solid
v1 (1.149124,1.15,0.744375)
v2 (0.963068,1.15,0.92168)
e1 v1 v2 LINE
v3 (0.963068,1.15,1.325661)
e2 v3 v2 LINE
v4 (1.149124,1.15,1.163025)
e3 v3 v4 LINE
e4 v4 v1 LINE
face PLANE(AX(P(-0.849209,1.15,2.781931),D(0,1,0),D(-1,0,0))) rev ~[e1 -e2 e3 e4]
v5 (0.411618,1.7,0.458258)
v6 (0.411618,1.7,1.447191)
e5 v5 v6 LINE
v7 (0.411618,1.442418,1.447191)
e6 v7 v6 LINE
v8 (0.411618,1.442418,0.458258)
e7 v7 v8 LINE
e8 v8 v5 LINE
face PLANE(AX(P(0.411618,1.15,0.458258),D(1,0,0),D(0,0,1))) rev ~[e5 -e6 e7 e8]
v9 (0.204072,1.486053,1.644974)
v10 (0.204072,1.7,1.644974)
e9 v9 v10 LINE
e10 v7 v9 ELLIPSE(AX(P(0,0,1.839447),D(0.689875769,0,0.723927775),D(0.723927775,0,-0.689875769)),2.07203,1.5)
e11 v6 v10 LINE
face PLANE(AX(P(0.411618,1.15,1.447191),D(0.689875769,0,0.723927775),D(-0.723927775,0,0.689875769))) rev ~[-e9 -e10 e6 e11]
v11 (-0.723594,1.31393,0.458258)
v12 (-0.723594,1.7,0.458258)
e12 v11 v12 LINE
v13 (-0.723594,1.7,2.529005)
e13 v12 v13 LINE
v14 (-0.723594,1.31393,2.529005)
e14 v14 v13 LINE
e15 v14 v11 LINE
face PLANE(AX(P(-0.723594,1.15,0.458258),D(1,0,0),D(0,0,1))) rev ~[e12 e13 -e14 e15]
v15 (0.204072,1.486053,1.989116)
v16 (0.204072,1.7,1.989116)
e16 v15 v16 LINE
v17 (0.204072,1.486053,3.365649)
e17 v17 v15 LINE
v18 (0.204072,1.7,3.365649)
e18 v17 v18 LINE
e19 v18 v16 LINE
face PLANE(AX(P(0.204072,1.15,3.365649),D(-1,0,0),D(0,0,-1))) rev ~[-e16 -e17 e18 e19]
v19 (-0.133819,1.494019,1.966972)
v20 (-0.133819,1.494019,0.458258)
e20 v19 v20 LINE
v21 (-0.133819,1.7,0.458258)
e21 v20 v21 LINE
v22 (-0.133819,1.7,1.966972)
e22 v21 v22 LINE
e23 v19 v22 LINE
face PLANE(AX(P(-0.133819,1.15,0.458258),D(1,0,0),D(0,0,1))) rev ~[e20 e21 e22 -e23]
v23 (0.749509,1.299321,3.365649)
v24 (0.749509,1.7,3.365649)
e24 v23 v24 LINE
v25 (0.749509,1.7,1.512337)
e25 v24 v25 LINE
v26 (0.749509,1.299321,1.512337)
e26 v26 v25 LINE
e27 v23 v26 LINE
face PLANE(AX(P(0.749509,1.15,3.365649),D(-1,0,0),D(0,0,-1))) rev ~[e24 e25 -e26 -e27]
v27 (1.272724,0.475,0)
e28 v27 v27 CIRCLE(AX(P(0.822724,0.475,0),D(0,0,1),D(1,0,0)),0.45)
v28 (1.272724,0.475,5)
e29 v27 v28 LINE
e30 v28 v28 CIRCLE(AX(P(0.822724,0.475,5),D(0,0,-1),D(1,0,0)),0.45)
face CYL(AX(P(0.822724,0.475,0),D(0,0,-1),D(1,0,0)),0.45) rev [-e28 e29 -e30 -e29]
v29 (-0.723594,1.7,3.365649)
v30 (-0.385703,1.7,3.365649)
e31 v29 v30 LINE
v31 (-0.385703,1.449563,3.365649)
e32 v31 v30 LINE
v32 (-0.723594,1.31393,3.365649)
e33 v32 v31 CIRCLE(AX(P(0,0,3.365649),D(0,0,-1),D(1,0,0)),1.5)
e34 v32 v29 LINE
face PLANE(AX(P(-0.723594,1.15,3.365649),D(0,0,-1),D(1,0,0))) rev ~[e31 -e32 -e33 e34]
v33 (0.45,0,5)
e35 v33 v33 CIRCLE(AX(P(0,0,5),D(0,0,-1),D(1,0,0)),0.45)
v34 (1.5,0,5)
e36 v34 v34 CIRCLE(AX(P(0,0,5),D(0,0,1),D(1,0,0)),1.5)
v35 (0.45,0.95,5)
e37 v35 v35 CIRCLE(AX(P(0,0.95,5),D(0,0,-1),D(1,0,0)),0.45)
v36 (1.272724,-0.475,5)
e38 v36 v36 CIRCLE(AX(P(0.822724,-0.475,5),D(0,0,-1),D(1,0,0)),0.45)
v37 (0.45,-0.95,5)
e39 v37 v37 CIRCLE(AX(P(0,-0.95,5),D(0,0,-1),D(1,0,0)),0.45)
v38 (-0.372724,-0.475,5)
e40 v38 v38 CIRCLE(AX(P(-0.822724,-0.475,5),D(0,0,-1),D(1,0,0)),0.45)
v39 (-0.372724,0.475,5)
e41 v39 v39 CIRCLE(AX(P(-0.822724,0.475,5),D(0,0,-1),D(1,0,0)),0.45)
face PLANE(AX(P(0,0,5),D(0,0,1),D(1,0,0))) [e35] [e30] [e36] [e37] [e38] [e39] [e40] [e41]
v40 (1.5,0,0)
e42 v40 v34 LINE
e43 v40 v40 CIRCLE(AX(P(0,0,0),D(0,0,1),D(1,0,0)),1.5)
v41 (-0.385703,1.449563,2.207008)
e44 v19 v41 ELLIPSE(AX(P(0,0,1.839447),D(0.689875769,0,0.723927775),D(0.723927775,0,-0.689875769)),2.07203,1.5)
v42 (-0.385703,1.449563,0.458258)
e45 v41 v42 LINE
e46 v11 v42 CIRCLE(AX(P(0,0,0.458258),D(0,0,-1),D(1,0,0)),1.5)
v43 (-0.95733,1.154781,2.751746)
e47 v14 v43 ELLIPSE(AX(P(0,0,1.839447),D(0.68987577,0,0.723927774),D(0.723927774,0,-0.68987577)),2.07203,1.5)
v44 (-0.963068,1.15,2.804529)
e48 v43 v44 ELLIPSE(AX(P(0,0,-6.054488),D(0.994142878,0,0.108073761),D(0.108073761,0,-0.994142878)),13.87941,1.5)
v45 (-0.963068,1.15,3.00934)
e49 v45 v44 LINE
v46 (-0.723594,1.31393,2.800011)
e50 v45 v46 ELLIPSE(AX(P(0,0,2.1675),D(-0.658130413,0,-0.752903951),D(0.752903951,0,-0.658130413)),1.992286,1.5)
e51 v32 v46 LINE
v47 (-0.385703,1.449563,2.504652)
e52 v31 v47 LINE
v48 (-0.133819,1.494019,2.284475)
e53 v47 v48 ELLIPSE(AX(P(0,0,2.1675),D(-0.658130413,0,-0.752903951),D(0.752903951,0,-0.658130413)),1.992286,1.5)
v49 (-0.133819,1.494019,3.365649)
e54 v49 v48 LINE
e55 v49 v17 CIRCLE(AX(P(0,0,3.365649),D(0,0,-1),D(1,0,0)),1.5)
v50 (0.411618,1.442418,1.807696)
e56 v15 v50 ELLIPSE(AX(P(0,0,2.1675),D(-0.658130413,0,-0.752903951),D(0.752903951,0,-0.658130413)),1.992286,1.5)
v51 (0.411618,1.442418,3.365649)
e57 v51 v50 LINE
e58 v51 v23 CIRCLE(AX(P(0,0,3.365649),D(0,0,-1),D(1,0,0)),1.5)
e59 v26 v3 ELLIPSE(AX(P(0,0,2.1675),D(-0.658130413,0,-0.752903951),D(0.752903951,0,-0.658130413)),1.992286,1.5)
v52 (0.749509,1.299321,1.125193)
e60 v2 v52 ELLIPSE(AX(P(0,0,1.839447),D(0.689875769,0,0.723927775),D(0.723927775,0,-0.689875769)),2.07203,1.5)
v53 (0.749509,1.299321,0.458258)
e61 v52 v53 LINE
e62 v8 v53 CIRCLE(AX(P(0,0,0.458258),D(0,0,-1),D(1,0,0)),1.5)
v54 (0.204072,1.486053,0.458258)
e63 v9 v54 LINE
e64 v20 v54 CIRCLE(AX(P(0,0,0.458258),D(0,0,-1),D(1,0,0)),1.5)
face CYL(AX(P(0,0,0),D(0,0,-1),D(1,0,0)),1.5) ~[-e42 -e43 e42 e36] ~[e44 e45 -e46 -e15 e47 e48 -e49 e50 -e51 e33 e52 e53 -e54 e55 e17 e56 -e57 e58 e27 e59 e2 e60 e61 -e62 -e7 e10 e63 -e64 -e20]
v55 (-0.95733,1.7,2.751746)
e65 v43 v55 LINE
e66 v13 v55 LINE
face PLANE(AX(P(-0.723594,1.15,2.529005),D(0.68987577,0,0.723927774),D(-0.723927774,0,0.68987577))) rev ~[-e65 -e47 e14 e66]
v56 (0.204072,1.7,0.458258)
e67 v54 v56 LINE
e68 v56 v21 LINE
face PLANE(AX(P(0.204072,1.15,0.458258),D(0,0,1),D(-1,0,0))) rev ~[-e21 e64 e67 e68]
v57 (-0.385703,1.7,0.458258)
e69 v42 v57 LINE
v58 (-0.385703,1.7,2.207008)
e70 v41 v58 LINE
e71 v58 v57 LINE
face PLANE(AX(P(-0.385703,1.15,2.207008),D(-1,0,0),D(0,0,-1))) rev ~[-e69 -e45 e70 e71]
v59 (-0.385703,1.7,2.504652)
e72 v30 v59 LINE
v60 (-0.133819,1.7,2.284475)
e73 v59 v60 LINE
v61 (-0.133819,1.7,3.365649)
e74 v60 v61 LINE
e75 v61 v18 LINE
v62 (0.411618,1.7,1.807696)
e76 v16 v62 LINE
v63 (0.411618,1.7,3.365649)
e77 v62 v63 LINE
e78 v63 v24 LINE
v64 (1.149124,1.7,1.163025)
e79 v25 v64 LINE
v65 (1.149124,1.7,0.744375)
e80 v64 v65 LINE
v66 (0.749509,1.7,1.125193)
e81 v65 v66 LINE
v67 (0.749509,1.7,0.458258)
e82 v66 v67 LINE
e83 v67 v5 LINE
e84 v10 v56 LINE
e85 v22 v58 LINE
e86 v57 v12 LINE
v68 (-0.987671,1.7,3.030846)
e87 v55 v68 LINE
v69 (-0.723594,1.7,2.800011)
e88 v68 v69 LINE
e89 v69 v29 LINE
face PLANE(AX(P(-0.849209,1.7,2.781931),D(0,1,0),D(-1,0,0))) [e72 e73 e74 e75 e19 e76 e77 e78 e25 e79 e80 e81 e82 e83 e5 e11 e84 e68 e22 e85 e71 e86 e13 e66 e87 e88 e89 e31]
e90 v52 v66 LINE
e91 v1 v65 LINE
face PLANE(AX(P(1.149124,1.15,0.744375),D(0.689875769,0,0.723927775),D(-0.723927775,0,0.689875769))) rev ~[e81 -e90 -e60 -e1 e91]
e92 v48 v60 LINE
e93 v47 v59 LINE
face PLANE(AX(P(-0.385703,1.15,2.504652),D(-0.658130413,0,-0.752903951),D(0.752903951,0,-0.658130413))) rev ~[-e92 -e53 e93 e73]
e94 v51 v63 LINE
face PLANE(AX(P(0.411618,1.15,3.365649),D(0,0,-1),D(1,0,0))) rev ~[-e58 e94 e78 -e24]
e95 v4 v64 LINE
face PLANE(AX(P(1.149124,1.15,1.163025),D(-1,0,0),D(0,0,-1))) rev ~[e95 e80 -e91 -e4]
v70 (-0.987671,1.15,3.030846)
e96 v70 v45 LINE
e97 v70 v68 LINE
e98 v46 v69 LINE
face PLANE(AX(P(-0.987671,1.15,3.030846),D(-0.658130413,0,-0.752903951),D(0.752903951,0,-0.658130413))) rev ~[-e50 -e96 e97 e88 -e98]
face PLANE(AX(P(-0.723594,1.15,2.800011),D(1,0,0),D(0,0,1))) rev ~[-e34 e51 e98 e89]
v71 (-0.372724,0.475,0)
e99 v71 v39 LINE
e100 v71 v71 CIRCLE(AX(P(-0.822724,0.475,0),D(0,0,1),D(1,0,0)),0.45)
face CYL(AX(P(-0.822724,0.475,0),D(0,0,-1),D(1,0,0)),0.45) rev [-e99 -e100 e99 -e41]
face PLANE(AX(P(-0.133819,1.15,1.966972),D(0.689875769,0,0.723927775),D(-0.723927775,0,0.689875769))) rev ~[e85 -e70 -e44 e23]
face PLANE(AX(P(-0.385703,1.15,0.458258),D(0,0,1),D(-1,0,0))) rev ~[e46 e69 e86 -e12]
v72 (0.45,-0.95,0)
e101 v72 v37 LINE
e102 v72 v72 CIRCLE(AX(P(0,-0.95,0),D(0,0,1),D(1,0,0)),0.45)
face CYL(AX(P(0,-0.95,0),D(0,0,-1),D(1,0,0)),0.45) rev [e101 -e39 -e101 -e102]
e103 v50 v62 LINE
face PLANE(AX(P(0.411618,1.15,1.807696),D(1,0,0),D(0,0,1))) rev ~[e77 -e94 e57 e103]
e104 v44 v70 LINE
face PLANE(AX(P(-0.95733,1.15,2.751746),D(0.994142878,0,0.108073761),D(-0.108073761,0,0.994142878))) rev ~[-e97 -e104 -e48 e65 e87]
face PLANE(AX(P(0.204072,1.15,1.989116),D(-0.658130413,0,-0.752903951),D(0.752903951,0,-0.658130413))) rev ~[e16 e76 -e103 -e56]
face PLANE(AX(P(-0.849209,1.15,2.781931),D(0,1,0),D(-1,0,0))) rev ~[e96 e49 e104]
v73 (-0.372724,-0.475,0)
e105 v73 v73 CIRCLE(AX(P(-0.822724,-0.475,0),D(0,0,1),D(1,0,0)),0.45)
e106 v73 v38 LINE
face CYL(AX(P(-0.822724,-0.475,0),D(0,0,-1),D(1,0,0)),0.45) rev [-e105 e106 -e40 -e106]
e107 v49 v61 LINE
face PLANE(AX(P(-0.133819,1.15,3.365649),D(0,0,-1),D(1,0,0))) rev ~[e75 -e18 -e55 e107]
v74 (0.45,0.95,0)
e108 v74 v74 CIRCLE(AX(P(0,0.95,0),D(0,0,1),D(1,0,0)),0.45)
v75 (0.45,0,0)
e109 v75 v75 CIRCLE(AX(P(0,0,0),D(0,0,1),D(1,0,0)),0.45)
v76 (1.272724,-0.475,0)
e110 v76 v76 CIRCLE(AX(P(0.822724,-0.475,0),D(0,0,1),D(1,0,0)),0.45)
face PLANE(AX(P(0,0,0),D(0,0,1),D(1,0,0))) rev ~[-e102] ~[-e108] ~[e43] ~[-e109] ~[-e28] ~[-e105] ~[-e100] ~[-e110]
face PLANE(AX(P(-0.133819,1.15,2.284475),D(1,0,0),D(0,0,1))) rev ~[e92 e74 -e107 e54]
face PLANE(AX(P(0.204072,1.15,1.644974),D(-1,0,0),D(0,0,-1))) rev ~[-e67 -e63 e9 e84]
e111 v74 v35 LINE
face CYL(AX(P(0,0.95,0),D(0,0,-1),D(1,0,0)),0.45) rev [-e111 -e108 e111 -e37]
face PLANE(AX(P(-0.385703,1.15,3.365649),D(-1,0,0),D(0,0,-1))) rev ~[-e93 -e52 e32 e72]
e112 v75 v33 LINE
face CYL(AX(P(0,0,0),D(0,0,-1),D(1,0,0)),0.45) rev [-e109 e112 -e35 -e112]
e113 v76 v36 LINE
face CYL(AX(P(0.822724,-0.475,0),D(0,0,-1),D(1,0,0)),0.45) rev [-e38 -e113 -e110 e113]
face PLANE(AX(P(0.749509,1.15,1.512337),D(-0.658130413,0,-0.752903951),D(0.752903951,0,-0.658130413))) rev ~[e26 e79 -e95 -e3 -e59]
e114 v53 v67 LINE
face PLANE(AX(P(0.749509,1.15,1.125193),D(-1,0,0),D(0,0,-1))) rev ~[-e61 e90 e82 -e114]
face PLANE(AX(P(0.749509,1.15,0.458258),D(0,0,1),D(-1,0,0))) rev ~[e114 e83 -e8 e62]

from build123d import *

# Parameters (mm, degrees)
F2_R      = 1.5
F3_DEPTH  = 5
F9_DEPTH  = 0.55
F1_R      = 0.45
F10_DEPTH = 5.001


with BuildPart() as f3:
    # F2 (on Top) → F3 (new body)
    with BuildSketch(Plane.XY):
        Circle(F2_R)
    extrude(amount=F3_DEPTH)

    # F8 (on face) → F9 (join)
    with BuildSketch(Plane(origin=(0, 1.15, 0), x_dir=(-1, 0, 0), z_dir=(0, 1, 0))):
        Polygon((0.9573300485, 2.7517464478), (0.9876711119, 3.0308461282), (0.7235942503, 2.8000105567), (0.7235942503, 2.5290050786), align=None)
        Polygon((0.7235942503, 2.5290050786), (0.7235942503, 2.8000105567), (0.3857031334, 2.5046522711), (0.3857031334, 2.2070076328), align=None)
        Polygon((0.3857031334, 2.5046522711), (0.7235942503, 2.8000105567), (0.7235942503, 3.3656487685), (0.3857031334, 3.3656487685), align=None)
        Polygon((0.7235942503, 0.4582579713), (0.7235942503, 2.5290050786), (0.3857031334, 2.2070076328), (0.3857031334, 0.4582579713), align=None)
        Polygon((0.3857031334, 2.2070076328), (0.3857031334, 2.5046522711), (0.1338190596, 2.2844746918), (0.1338190596, 1.966971644), align=None)
        Polygon((0.1338190596, 1.966971644), (0.1338190596, 2.2844746918), (-0.2040720574, 1.9891164063), (-0.2040720574, 1.6449741982), align=None)
        Polygon((-0.2040720574, 1.9891164063), (0.1338190596, 2.2844746918), (0.1338190596, 3.3656487685), (-0.2040720574, 3.3656487685), align=None)
        Polygon((0.1338190596, 0.4582579713), (0.1338190596, 1.966971644), (-0.2040720574, 1.6449741982), (-0.2040720574, 0.4582579713), align=None)
        Polygon((-0.2040720574, 1.6449741982), (-0.2040720574, 1.9891164063), (-0.4116180899, 1.8076957141), (-0.4116180899, 1.4471906846), align=None)
        Polygon((-0.4116180899, 1.4471906846), (-0.4116180899, 1.8076957141), (-0.7495092068, 1.5123374285), (-0.7495092068, 1.1251932388), align=None)
        Polygon((-0.7495092068, 1.5123374285), (-0.4116180899, 1.8076957141), (-0.4116180899, 3.3656487685), (-0.7495092068, 3.3656487685), align=None)
        Polygon((-0.4116180899, 0.4582579713), (-0.4116180899, 1.4471906846), (-0.7495092068, 1.1251932388), (-0.7495092068, 0.4582579713), align=None)
        Polygon((-0.7495092068, 1.1251932388), (-0.7495092068, 1.5123374285), (-1.1491243131, 1.1630248046), (-1.1491243131, 0.7443751674), align=None)
    extrude(amount=F9_DEPTH)

    # F1 (on Top) → F10 (cut, through all)
    with BuildSketch(Plane.XY):
        Circle(F1_R)
        with Locations((0, 0.95)):
            Circle(F1_R)
        with Locations((0.8227241336, 0.475)):
            Circle(F1_R)
        with Locations((0.8227241336, -0.475)):
            Circle(F1_R)
        with Locations((0, -0.95)):
            Circle(F1_R)
        with Locations((-0.8227241336, -0.475)):
            Circle(F1_R)
        with Locations((-0.8227241336, 0.475)):
            Circle(F1_R)
    extrude(amount=F10_DEPTH, mode=Mode.SUBTRACT)


solid = f3.part
